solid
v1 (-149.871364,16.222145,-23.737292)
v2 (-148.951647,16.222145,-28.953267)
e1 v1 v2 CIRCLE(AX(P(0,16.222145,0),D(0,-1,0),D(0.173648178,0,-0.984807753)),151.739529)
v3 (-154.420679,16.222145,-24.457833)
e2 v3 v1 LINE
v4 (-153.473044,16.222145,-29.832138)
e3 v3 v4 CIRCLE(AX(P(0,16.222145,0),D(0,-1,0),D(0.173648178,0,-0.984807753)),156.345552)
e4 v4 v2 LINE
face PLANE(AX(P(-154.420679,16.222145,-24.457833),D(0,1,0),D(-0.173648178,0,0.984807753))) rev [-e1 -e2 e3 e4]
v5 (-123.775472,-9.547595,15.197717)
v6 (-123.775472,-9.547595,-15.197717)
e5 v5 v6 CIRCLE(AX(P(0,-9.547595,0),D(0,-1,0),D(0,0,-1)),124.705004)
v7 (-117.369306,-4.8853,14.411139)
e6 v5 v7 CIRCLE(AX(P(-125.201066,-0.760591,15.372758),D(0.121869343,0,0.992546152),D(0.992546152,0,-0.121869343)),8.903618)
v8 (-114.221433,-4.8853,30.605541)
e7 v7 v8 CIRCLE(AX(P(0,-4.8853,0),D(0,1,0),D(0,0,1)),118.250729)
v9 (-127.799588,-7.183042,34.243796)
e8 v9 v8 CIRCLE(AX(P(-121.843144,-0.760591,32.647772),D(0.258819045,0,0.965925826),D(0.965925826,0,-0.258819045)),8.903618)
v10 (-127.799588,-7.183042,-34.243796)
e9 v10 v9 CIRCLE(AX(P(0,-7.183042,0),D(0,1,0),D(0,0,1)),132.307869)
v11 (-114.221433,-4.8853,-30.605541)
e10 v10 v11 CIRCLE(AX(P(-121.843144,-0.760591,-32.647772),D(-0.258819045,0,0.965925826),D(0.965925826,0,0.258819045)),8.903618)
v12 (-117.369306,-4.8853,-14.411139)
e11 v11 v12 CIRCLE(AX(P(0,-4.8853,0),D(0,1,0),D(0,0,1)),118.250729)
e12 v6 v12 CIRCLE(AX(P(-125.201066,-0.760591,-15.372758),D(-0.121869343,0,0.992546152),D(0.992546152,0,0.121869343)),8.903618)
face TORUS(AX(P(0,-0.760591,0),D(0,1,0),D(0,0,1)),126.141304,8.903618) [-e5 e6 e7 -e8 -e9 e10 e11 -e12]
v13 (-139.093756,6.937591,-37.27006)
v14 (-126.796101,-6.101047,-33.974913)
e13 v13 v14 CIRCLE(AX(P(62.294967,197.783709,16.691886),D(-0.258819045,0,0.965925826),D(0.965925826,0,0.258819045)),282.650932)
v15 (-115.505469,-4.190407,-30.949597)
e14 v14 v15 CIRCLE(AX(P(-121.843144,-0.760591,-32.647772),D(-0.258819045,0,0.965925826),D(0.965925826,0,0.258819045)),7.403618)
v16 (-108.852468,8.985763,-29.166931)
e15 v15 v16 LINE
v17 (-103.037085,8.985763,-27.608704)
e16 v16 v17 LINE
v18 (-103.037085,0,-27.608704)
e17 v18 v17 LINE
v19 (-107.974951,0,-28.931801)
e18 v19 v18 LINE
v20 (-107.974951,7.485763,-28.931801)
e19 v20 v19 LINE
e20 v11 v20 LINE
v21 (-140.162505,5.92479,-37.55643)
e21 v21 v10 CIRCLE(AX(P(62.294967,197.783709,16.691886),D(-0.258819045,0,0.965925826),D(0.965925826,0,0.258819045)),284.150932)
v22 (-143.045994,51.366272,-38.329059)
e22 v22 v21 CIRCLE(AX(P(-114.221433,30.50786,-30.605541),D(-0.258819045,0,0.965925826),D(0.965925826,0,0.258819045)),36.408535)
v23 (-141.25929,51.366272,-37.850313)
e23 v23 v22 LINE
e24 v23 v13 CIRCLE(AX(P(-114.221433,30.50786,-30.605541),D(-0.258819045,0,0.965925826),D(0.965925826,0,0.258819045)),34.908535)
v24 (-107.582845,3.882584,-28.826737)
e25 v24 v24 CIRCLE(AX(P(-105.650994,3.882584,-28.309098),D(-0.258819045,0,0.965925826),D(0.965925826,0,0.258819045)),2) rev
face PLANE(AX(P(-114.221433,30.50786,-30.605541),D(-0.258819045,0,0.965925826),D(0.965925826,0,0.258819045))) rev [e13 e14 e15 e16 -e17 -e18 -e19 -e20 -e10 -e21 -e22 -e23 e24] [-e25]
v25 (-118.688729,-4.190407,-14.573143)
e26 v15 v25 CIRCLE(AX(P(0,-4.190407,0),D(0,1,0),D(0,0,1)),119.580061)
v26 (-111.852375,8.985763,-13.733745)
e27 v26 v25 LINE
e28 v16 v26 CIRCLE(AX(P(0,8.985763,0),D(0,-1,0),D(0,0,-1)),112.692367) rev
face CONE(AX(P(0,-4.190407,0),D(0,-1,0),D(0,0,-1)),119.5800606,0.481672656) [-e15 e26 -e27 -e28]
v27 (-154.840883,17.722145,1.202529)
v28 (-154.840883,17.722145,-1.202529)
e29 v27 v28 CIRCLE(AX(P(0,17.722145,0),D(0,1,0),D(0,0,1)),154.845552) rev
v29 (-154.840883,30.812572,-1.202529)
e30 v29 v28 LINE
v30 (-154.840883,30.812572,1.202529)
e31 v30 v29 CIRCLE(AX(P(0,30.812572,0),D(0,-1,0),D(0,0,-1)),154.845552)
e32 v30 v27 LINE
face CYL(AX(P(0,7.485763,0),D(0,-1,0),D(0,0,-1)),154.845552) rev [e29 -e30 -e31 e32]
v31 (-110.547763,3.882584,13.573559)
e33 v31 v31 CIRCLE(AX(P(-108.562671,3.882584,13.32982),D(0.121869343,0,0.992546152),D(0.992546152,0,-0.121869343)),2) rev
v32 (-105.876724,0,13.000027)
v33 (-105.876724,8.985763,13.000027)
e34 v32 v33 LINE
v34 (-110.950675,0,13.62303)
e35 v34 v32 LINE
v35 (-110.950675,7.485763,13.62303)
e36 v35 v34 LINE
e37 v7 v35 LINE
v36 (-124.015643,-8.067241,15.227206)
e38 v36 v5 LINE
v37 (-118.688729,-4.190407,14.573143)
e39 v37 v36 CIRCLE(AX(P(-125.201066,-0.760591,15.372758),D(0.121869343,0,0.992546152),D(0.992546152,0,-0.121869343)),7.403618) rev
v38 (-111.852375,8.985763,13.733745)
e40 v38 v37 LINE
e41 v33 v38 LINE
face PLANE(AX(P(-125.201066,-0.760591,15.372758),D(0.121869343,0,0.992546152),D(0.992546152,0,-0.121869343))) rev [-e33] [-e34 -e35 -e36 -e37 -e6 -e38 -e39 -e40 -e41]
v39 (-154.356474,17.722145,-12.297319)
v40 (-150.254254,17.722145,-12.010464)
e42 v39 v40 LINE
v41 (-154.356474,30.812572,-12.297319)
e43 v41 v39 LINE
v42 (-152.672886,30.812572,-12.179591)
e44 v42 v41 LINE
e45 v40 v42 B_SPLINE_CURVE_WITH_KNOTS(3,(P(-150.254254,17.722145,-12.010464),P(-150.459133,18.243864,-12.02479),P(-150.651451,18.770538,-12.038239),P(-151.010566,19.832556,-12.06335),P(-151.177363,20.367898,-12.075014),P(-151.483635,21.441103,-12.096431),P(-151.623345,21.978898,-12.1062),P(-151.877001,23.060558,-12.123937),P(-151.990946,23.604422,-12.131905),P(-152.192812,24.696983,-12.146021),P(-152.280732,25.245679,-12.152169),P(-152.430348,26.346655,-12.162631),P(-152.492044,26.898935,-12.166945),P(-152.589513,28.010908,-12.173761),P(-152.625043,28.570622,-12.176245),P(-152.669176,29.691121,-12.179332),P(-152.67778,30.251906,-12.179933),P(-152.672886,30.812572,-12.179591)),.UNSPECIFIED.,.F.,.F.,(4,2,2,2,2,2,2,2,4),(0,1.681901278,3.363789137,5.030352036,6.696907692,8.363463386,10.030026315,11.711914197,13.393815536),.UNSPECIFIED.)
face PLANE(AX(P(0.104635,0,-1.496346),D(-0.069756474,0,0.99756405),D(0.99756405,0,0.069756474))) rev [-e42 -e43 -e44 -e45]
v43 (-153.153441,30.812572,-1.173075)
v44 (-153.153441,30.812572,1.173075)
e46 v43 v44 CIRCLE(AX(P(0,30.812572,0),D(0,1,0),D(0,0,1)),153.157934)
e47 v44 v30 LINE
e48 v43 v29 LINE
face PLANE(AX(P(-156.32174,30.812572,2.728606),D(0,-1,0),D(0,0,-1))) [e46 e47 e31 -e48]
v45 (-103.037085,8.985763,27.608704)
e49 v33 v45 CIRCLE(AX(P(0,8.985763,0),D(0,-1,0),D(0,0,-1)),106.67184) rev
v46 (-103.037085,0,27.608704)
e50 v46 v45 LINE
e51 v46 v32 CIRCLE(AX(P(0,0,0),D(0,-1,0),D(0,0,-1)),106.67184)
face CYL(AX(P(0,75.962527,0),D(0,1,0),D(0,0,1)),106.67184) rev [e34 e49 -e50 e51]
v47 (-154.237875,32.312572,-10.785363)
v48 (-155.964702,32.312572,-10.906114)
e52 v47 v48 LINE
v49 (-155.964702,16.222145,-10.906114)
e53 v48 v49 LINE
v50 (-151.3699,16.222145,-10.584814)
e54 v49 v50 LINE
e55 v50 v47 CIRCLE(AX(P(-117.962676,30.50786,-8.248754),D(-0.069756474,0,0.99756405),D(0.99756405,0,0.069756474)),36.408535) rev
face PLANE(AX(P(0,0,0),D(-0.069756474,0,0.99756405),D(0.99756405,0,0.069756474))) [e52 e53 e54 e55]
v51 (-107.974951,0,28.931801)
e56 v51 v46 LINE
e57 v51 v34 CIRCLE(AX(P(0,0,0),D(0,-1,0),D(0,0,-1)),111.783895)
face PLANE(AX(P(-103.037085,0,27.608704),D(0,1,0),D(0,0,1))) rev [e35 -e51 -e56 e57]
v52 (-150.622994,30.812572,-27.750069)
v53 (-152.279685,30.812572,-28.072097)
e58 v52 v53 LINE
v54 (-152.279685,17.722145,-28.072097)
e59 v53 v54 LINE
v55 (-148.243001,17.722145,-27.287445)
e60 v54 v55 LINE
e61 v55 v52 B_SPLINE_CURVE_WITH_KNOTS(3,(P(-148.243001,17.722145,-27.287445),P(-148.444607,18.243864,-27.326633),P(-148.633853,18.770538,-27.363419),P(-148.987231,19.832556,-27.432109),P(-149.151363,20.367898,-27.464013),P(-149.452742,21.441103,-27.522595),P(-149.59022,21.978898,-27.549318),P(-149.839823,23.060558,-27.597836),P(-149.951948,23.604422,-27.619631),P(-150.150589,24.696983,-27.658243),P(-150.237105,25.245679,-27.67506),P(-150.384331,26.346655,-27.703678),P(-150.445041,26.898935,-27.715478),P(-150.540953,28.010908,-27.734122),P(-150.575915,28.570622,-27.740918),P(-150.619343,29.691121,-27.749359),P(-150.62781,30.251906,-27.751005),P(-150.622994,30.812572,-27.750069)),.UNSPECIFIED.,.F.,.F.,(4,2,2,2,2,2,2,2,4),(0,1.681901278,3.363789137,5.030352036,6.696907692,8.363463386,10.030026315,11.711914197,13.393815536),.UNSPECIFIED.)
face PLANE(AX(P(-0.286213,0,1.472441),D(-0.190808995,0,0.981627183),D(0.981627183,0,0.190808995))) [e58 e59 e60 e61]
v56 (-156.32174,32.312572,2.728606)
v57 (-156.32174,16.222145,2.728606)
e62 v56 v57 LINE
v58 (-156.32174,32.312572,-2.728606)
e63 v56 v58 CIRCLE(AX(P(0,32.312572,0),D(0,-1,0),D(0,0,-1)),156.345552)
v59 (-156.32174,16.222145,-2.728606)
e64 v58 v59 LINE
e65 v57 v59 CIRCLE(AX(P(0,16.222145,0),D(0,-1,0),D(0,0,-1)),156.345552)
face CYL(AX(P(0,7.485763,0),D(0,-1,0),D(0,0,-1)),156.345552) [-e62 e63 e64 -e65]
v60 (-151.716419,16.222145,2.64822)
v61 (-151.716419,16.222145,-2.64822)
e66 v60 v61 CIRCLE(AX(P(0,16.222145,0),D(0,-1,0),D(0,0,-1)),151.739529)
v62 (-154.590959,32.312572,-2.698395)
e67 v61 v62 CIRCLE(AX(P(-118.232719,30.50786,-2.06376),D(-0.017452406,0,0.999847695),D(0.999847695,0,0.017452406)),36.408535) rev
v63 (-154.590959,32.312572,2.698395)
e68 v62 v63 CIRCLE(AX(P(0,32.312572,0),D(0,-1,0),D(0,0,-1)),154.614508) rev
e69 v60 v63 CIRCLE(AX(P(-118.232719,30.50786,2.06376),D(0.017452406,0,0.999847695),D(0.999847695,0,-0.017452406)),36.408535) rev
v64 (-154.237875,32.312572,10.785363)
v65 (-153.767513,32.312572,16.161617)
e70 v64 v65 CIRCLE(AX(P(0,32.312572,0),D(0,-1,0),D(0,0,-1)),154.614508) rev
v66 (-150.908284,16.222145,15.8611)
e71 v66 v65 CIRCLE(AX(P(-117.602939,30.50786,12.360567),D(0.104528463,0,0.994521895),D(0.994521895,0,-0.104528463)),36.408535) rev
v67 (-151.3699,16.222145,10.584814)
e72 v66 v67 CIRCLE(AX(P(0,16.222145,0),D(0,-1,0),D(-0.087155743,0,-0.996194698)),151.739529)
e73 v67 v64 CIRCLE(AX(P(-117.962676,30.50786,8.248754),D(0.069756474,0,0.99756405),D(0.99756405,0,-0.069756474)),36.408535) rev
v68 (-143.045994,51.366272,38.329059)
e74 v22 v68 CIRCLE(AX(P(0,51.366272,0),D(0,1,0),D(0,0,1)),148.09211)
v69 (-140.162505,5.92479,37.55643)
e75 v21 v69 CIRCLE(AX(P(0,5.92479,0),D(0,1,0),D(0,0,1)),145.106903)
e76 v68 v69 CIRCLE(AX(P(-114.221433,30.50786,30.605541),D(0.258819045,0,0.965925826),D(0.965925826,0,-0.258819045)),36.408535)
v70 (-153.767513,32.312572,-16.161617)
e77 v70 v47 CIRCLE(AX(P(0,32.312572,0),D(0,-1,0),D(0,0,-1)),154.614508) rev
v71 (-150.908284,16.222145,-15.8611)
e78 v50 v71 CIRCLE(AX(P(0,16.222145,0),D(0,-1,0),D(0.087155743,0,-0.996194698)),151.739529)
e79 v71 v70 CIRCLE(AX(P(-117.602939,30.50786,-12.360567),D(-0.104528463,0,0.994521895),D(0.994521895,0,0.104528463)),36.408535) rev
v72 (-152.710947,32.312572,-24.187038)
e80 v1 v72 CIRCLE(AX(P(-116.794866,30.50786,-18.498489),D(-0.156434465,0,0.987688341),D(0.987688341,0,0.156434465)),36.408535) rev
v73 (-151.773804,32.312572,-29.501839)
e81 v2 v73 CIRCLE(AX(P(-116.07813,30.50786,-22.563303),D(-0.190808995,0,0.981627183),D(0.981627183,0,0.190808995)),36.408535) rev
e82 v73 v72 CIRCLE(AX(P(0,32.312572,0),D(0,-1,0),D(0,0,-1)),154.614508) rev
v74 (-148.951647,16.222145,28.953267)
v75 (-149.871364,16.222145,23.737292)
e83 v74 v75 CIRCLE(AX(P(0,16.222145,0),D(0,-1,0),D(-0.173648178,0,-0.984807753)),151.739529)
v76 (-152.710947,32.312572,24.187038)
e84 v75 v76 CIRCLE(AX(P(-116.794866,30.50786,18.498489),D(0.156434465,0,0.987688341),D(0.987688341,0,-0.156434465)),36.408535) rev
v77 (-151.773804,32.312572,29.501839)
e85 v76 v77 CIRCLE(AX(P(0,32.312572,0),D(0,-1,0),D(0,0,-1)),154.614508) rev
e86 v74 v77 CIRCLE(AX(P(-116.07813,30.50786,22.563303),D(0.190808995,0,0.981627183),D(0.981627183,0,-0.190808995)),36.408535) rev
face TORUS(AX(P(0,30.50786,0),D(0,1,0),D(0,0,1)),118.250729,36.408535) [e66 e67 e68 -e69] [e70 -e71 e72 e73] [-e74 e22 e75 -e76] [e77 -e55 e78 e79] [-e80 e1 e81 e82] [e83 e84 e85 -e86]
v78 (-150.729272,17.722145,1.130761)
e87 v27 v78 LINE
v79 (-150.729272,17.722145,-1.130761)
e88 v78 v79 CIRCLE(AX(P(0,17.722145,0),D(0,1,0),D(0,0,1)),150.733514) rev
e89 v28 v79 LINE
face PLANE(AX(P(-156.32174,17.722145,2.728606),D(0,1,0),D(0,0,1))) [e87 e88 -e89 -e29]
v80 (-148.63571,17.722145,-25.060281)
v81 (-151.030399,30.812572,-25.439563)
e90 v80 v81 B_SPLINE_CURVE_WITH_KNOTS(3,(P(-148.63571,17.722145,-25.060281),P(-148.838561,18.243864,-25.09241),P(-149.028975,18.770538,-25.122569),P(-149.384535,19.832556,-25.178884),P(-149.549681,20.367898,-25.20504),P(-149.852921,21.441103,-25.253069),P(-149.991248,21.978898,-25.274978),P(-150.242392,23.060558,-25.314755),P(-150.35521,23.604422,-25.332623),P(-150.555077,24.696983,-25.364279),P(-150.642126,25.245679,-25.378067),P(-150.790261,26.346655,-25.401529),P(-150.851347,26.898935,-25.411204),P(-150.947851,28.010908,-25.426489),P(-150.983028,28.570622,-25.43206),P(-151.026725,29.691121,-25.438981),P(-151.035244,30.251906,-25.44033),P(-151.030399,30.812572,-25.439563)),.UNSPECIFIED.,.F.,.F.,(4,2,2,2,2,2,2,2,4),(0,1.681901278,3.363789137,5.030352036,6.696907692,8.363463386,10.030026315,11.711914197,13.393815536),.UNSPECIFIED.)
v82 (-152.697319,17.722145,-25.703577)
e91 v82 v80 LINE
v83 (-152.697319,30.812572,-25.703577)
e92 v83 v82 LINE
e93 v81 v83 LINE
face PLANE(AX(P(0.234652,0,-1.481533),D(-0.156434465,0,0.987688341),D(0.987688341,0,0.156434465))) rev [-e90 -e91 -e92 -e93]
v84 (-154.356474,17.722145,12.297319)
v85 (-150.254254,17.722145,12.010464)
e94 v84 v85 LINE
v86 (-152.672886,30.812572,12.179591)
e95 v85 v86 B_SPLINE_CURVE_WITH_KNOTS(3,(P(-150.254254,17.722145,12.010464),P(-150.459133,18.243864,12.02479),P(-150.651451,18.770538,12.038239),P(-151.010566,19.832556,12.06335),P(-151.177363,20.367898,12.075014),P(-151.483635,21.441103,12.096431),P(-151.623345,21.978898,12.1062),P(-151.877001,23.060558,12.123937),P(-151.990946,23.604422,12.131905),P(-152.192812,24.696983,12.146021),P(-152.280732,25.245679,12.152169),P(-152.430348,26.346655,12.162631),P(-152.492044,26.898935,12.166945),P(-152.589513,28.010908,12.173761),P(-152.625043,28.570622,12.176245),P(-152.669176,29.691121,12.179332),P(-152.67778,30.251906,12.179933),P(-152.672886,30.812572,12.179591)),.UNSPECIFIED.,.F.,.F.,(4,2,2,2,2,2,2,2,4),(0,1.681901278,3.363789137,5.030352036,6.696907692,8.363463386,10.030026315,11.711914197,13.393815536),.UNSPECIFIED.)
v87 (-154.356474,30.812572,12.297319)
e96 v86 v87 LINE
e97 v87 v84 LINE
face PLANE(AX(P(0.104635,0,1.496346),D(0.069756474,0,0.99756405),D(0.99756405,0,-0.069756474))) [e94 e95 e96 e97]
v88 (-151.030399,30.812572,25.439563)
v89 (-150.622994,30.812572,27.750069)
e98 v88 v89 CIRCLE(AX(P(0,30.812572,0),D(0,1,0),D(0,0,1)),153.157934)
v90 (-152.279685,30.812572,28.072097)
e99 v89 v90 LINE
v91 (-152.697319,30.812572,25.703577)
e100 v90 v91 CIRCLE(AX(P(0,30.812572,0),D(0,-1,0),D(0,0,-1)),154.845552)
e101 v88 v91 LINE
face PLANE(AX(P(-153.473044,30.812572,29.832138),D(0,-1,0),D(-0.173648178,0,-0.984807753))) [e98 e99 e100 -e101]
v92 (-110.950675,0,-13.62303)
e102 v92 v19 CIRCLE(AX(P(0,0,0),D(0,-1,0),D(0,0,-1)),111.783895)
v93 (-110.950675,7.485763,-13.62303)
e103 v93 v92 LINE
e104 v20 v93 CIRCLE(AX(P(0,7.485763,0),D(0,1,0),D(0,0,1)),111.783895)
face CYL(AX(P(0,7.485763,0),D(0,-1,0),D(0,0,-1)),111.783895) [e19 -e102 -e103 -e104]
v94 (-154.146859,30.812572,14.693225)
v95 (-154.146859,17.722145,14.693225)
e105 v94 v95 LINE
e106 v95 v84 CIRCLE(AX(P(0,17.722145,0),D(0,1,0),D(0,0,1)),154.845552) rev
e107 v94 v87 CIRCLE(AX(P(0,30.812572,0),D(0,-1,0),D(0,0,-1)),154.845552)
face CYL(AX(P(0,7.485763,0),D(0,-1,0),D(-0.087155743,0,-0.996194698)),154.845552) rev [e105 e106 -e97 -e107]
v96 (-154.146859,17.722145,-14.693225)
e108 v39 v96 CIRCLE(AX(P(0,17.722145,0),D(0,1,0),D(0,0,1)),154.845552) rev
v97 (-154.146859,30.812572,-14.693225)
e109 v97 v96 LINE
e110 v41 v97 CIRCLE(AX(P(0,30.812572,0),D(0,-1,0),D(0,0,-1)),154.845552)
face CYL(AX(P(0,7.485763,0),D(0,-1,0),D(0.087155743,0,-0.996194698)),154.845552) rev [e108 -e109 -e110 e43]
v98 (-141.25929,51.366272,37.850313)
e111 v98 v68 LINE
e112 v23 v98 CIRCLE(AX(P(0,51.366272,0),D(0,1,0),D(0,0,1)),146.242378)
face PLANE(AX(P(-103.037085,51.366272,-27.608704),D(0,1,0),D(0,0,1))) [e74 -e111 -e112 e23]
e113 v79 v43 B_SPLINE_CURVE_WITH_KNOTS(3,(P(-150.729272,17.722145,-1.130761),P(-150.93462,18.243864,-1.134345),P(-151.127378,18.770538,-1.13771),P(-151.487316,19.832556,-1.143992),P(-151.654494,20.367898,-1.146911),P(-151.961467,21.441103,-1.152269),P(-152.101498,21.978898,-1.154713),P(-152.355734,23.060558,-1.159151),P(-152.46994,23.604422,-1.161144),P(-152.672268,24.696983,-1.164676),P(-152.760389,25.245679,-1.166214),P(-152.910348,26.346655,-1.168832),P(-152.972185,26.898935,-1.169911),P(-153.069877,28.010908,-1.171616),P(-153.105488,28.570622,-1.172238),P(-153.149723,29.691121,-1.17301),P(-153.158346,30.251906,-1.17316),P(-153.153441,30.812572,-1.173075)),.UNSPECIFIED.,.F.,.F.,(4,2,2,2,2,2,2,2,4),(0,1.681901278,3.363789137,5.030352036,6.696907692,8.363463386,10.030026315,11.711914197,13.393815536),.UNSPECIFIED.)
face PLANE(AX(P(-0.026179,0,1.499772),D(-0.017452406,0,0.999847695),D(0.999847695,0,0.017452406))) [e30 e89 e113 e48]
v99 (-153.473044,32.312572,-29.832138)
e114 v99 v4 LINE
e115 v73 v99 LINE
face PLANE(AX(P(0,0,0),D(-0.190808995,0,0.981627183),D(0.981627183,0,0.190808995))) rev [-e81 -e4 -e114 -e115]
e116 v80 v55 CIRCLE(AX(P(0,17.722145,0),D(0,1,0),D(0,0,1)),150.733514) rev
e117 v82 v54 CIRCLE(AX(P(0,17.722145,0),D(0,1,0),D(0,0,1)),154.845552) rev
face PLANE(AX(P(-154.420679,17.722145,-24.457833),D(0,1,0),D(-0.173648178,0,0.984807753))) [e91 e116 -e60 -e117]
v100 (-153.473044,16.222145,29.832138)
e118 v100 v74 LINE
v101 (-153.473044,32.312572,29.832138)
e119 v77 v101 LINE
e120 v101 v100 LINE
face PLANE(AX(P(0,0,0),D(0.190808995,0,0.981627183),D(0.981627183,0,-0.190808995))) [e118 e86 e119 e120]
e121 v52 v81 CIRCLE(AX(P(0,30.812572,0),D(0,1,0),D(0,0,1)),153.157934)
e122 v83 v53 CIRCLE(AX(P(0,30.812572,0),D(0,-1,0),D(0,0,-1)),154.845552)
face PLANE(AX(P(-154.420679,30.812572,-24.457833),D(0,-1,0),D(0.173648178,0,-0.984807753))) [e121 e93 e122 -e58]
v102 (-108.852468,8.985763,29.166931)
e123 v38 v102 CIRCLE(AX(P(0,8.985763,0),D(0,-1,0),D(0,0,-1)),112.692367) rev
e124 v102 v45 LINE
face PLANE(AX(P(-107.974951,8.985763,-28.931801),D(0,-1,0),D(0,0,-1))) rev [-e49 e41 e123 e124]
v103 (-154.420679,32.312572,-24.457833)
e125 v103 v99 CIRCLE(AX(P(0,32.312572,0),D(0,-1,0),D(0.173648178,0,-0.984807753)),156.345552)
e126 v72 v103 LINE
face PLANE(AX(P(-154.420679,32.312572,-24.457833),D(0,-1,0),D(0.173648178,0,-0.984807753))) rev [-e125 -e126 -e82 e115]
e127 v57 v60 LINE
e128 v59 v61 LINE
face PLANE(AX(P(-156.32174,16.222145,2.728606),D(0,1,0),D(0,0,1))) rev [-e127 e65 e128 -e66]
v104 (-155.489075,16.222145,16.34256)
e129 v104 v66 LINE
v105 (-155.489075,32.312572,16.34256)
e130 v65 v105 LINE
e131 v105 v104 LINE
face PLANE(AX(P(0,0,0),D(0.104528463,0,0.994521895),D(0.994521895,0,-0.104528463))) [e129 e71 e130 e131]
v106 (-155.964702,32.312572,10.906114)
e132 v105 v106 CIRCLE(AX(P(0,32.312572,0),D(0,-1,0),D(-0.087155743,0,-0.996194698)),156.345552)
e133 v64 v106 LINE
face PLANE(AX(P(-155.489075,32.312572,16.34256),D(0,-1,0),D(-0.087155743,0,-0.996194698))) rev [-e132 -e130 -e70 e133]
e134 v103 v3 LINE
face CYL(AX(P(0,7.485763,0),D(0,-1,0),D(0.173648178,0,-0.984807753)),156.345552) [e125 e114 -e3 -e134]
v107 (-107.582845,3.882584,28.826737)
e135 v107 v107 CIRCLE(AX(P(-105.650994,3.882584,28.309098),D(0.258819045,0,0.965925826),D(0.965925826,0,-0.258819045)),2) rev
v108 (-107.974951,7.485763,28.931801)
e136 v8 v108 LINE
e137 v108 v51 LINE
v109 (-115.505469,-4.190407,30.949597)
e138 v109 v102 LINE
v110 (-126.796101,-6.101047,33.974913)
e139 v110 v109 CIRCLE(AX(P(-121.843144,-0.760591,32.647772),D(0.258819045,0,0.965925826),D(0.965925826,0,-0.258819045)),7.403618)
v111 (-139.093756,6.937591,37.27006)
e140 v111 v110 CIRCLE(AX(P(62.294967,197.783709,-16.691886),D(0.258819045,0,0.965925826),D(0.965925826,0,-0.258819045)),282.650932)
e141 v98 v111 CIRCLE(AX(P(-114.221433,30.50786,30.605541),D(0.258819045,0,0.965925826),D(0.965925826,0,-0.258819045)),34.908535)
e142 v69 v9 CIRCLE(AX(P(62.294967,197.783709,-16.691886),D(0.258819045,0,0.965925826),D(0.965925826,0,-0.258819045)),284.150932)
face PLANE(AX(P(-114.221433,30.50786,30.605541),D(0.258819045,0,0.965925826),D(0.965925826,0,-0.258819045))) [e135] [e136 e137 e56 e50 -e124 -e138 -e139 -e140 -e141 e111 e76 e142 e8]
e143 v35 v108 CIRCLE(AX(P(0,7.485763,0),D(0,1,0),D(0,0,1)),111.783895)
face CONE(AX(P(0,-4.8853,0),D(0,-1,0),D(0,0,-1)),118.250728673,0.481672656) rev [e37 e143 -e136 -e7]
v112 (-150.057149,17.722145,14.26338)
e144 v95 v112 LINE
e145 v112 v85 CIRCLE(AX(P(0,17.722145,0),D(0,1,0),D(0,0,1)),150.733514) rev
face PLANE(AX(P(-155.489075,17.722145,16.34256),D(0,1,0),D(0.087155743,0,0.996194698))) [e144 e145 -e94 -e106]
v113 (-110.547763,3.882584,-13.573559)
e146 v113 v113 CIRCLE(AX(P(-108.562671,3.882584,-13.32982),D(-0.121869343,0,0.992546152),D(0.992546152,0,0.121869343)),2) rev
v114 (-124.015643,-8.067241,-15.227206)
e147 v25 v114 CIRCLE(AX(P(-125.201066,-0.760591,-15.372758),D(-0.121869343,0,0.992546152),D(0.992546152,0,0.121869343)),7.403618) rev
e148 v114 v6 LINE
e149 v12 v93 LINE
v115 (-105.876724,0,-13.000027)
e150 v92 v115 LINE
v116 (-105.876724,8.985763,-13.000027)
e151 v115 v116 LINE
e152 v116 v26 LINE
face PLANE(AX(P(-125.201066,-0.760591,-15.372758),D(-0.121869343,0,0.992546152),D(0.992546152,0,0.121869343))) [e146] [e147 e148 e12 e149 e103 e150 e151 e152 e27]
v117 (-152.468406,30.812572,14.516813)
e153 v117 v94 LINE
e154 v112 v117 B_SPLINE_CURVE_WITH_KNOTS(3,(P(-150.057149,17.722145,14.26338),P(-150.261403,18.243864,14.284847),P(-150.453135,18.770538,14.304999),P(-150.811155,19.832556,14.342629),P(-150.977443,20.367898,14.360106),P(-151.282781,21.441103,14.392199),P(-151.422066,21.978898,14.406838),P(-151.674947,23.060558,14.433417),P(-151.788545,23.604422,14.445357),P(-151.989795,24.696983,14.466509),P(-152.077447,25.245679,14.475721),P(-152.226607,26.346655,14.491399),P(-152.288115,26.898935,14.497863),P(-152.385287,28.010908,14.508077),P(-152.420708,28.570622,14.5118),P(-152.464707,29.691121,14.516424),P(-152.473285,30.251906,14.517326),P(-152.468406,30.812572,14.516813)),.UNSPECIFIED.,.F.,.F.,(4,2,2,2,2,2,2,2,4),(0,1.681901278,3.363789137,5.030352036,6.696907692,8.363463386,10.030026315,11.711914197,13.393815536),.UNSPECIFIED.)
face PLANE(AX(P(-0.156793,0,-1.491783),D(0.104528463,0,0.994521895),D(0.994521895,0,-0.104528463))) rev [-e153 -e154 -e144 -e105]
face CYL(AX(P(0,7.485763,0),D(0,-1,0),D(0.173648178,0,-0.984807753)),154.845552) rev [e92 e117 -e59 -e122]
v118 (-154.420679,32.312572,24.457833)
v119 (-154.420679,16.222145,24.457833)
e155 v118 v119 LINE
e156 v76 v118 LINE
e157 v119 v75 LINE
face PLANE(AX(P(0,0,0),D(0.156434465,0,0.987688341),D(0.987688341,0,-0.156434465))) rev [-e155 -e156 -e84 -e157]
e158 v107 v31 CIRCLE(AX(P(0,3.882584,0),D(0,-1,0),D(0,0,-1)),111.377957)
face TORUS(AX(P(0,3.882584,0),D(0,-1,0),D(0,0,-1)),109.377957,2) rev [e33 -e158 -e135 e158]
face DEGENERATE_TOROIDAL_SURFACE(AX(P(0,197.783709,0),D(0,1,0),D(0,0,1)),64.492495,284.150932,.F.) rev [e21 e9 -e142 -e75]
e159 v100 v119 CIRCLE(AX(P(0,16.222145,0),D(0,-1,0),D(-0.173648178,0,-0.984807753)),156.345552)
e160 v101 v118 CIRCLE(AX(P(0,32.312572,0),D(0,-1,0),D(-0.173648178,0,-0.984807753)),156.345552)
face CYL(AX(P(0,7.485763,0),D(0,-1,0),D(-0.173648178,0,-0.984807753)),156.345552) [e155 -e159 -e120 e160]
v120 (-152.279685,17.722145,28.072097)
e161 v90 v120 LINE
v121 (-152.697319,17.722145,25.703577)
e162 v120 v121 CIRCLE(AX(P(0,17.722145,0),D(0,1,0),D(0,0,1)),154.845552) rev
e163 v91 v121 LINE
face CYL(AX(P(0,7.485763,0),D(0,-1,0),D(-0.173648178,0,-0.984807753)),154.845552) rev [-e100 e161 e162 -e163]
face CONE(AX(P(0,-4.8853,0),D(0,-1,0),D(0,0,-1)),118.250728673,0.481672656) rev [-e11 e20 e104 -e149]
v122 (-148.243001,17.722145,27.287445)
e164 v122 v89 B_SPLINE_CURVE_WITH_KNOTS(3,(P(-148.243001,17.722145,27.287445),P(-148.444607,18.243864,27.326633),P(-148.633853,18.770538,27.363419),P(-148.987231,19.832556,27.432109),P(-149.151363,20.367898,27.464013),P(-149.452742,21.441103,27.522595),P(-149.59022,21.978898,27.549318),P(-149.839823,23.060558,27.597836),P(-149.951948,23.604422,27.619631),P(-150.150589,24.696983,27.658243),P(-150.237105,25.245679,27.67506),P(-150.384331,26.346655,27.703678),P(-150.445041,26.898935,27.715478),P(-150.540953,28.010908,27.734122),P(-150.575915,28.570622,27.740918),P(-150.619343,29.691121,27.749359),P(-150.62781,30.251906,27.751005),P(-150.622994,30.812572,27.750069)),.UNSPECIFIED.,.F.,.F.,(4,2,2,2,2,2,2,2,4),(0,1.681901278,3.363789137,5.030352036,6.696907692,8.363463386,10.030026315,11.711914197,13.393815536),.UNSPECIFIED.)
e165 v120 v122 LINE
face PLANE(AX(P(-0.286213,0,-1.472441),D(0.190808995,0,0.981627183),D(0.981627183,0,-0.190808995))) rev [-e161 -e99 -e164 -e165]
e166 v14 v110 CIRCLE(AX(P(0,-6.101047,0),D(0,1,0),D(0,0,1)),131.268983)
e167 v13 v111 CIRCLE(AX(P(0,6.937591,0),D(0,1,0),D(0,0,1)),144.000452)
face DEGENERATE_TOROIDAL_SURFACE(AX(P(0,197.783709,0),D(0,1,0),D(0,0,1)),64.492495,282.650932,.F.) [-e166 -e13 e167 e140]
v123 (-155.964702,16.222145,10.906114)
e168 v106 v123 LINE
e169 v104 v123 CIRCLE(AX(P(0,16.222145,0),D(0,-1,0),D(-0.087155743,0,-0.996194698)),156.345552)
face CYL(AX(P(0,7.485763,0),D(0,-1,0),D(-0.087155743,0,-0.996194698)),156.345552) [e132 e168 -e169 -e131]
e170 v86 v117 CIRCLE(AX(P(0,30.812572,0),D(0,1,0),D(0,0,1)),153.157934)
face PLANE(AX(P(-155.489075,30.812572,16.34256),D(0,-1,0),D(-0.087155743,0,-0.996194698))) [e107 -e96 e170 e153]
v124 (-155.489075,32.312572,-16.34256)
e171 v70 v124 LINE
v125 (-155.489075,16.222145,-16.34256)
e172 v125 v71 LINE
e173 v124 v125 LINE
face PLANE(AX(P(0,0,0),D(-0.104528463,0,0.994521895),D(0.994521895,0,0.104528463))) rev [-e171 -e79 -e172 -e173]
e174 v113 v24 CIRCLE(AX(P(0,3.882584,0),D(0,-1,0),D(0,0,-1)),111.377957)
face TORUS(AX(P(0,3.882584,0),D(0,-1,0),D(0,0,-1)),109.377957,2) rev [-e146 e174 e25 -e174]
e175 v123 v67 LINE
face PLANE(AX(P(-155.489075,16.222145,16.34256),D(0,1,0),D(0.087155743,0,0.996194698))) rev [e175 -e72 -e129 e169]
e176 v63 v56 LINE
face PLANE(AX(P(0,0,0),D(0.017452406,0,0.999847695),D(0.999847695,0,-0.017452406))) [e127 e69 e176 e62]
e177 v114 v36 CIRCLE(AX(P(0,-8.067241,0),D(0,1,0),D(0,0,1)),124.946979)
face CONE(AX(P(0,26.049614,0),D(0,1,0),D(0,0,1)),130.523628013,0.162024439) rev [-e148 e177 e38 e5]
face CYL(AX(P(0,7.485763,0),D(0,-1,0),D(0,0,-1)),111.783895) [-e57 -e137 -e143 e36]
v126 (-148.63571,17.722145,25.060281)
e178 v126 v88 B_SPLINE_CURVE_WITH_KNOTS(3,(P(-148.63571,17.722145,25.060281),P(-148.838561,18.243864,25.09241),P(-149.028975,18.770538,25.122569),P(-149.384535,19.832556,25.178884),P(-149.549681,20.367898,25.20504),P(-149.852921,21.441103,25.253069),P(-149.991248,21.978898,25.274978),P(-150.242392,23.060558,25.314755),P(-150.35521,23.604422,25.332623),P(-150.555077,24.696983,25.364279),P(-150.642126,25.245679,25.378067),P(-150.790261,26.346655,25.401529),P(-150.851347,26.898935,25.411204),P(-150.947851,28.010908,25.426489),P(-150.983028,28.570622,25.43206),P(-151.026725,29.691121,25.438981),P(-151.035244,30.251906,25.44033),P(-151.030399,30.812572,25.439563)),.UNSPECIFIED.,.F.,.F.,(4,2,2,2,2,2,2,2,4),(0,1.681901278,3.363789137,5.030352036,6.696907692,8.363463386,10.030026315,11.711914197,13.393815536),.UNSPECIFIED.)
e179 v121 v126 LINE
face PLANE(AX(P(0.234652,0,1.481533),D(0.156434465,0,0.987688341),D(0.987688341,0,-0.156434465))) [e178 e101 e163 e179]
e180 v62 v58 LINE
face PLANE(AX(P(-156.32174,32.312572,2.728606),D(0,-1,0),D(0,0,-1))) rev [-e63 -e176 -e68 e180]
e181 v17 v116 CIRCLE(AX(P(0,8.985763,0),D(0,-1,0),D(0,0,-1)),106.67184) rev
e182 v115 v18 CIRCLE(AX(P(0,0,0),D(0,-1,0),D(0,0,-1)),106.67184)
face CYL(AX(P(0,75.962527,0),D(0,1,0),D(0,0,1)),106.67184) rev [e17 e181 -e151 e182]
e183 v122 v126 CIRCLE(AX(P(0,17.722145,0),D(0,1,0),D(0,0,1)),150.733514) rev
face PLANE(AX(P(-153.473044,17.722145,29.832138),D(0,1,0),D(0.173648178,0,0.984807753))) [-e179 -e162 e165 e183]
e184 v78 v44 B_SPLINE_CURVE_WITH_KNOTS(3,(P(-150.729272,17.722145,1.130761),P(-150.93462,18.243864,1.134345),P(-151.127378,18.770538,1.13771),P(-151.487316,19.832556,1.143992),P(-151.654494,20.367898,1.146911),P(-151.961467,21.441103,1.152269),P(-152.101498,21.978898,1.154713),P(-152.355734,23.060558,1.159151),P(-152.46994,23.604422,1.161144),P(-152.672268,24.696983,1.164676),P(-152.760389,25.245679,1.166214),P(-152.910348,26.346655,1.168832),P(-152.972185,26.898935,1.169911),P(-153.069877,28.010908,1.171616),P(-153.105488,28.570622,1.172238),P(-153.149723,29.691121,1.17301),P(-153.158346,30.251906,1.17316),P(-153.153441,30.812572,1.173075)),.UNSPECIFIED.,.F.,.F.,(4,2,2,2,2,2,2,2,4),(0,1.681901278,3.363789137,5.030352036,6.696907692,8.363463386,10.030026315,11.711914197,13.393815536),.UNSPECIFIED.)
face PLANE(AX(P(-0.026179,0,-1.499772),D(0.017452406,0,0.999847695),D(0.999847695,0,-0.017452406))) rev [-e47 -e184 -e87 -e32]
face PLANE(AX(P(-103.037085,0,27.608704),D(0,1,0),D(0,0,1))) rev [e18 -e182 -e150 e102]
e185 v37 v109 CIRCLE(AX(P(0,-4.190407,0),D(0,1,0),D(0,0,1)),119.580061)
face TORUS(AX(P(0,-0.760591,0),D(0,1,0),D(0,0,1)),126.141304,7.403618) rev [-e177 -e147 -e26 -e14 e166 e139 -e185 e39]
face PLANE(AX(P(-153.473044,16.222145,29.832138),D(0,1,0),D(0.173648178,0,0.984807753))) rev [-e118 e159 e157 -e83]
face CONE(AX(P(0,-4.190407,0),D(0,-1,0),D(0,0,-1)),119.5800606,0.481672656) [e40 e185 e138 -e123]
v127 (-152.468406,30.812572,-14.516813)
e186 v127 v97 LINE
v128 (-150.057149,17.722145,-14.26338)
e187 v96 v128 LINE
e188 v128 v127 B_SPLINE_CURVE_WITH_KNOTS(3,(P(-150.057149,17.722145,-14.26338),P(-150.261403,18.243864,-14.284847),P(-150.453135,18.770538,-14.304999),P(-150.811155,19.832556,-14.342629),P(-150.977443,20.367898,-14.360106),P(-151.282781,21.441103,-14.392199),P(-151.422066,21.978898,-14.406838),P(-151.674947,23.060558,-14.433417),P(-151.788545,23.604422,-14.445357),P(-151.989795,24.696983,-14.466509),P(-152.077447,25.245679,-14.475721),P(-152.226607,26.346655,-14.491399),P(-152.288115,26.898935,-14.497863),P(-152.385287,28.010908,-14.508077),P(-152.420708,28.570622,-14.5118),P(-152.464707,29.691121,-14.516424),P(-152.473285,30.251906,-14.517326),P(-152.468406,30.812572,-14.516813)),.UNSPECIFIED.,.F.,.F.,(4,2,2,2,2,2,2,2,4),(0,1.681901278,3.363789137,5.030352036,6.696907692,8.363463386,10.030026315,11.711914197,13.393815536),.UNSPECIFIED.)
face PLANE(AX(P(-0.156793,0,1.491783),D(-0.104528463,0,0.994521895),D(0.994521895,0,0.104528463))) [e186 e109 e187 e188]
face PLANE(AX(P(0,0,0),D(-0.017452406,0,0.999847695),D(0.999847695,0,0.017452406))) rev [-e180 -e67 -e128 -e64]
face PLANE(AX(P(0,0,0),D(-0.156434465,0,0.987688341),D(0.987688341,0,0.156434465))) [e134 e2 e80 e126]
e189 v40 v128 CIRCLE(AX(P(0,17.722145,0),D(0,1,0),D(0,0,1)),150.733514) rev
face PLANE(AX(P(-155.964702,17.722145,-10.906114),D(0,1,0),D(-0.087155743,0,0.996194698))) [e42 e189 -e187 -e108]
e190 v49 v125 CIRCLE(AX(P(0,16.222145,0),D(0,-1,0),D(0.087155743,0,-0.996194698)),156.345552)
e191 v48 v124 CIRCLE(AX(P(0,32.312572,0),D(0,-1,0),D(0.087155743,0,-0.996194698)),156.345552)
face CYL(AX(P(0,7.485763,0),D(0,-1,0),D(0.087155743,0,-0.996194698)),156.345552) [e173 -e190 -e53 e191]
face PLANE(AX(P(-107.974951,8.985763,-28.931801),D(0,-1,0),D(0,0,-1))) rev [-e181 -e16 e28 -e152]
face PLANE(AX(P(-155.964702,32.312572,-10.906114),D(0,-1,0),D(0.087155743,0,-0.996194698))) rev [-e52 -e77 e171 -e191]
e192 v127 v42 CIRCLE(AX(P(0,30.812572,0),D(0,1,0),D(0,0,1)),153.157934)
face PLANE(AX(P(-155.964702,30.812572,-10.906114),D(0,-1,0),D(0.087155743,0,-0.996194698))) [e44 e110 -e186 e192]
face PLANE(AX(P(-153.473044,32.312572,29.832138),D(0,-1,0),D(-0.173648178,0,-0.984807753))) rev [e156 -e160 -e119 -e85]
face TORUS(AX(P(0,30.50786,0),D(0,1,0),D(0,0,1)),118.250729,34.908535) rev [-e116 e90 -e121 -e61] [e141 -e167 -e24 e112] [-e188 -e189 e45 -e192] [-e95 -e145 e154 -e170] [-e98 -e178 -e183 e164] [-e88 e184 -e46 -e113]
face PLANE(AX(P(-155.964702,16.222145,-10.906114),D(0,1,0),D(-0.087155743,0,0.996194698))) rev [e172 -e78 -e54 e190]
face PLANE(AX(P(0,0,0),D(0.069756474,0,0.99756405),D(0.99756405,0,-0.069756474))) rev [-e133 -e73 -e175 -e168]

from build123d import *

# Parameters (mm, degrees)
REVOLVE1_ANGLE                  = 15
REVOLVE1_OTHER_WAY_ANGLE        = 15
REVOLVE2_START                  = 16.222144695
REVOLVE2_DEPTH                  = 16.090427574
CIRPATTERN1_COUNT               = 3
CIRPATTERN1_ANGLE               = 10
CIRPATTERN1_THE_OTHER_WAY_COUNT = 3
CIRPATTERN1_THE_OTHER_WAY_ANGLE = 10
SHELL3_START                    = 8.985762726
SHELL3_2_DEPTH                  = 42.380509533
SHELL3_START_2                  = 17.722144695
SHELL3_3_DEPTH                  = 13.090427574
SKETCH3_W                       = 5.112055803
SKETCH3_H                       = 7.485762726
REVOLVE3_ANGLE                  = 15
REVOLVE3_OTHER_WAY_ANGLE        = 15
CUT_REVOLVE2_ANGLE              = 7
CUT_REVOLVE2_OTHER_WAY_ANGLE    = 7
SKETCH11_R                      = 2


with BuildPart() as part:
    # Sketch1 → Revolve1 (revolve)
    with BuildSketch(Plane.XY):
        with BuildLine():
            Line((-111.783895357, 7.485762726), (-118.250728673, -4.885300025))
            ThreePointArc((-118.250728673, -4.885300025), (-124.705004152, -9.547595462), (-132.307869355, -7.183042355))
            ThreePointArc((-132.307869355, -7.183042355), (-138.813052314, -0.732302942), (-145.106903203, 5.924789912))
            ThreePointArc((-145.106903203, 5.924789912), (-154.580954265, 28.121202409), (-148.092110072, 51.366272259))
            Line((-148.092110072, 51.366272259), (-106.671839554, 51.366272259))
            Line((-106.671839554, 51.366272259), (-106.671839554, 7.485762726))
            Line((-106.671839554, 7.485762726), (-111.783895357, 7.485762726))
        make_face()
    revolve(axis=Axis((0, 75.962527062, 0), (0, -1, 0)), revolution_arc=REVOLVE1_ANGLE)

    # Sketch1 → Revolve1 other way (revolve)
    with BuildSketch(Plane.XY):
        with BuildLine():
            Line((-111.783895357, 7.485762726), (-118.250728673, -4.885300025))
            ThreePointArc((-118.250728673, -4.885300025), (-124.705004152, -9.547595462), (-132.307869355, -7.183042355))
            ThreePointArc((-132.307869355, -7.183042355), (-138.813052314, -0.732302942), (-145.106903203, 5.924789912))
            ThreePointArc((-145.106903203, 5.924789912), (-154.580954265, 28.121202409), (-148.092110072, 51.366272259))
            Line((-148.092110072, 51.366272259), (-106.671839554, 51.366272259))
            Line((-106.671839554, 51.366272259), (-106.671839554, 7.485762726))
            Line((-106.671839554, 7.485762726), (-111.783895357, 7.485762726))
        make_face()
    revolve(axis=Axis((0, 75.962527062, 0), (0, 1, 0)), revolution_arc=REVOLVE1_OTHER_WAY_ANGLE)

    # Revolve2: read off the stored shape, not the designer's step
    # Revolve2 outline → Revolve2 (add)
    with BuildSketch(Plane(origin=(0, 0, 0), x_dir=(1, 0, 0), z_dir=(0, 1, 0)).offset(REVOLVE2_START)):
        with BuildLine():
            ThreePointArc((-156.32174005, 2.728606122), (-156.345552235, 0), (-156.32174005, -2.728606122))
            Line((-156.32174005, -2.728606122), (-151.716418742, -2.64821994))
            Line((-151.716418742, -2.64821994), (-150, -2.61825974))
            Line((-150, -2.61825974), (-150, 2.61825974))
            Line((-150, 2.61825974), (-151.716418742, 2.64821994))
            Line((-151.716418742, 2.64821994), (-156.32174005, 2.728606122))
        make_face()
    revolve2 = extrude(amount=REVOLVE2_DEPTH)

    # CirPattern1: Revolve2 ×3 about axis
    cirpattern1_axis = Axis((0, 0, 0), (0, 1, 0))
    for i in range(1, CIRPATTERN1_COUNT):
        add(revolve2.rotate(cirpattern1_axis, i * CIRPATTERN1_ANGLE / (CIRPATTERN1_COUNT - 1)))

    # CirPattern1 the other way: Revolve2 ×3 about axis
    cirpattern1_the_other_way_axis = Axis((0, 0, 0), (0, -1, 0))
    for i in range(1, CIRPATTERN1_THE_OTHER_WAY_COUNT):
        add(revolve2.rotate(cirpattern1_the_other_way_axis, i * CIRPATTERN1_THE_OTHER_WAY_ANGLE / (CIRPATTERN1_THE_OTHER_WAY_COUNT - 1)))

    # Shell3: read off the stored shape, not the designer's step
    # Shell3 outline → Shell3 (revolve, cut)
    with BuildSketch(Plane.XY):
        with BuildLine():
            ThreePointArc((131.268982929, -6.101046516), (137.739825777, 0.315640187), (144.000452154, 6.937591016))
            ThreePointArc((144.000452154, 6.937591016), (153.114903986, 28.748570347), (146.242378119, 51.366272259))
            Line((146.242378119, 51.366272259), (112.692366824, 51.366272259))
            Line((112.692366824, 51.366272259), (112.692366824, 8.985762726))
            Line((112.692366824, 8.985762726), (119.5800606, -4.190406776))
            ThreePointArc((119.5800606, -4.190406776), (124.946978842, -8.067241366), (131.268982929, -6.101046516))
        make_face()
    revolve(axis=Axis((0, 0, 0), (0, 1, 0)), mode=Mode.SUBTRACT)

    # Shell3 2 outline → Shell3 2 (cut)
    with BuildSketch(Plane(origin=(0, 0, 0), x_dir=(1, 0, 0), z_dir=(0, 1, 0)).offset(SHELL3_START)):
        with BuildLine():
            Line((-103.037084763, 27.608703653), (-108.852467541, 29.166930772))
            ThreePointArc((-108.852467541, 29.166930772), (-112.692366824, 0), (-108.852467541, -29.166930772))
            Line((-108.852467541, -29.166930772), (-103.037084763, -27.608703653))
            ThreePointArc((-103.037084763, -27.608703653), (-106.671839554, 0), (-103.037084763, 27.608703653))
        make_face()
    extrude(amount=SHELL3_2_DEPTH, mode=Mode.SUBTRACT)

    # Shell3 3 outline → Shell3 3 (cut)
    with BuildSketch(Plane(origin=(0, 0, 0), x_dir=(1, 0, 0), z_dir=(0, 1, 0)).offset(SHELL3_START_2)):
        with BuildLine():
            ThreePointArc((-154.840882749, 1.20252917), (-154.845552235, 0), (-154.840882749, -1.20252917))
            Line((-154.840882749, -1.20252917), (-150.729272176, -1.13076074))
            Line((-150.729272176, -1.13076074), (-112.691399989, -0.466807206))
            ThreePointArc((-112.691399989, -0.466807206), (-112.692366824, 0), (-112.691399989, 0.466807206))
            Line((-112.691399989, 0.466807206), (-150.729272176, 1.13076074))
            Line((-150.729272176, 1.13076074), (-154.840882749, 1.20252917))
        make_face()
        with BuildLine():
            ThreePointArc((-112.22189026, -10.286733541), (-112.263538345, -9.821786937), (-112.303260118, -9.356671802))
            Line((-112.303260118, -9.356671802), (-150.254254081, -12.010463816))
            Line((-150.254254081, -12.010463816), (-154.356473766, -12.29731896))
            ThreePointArc((-154.356473766, -12.29731896), (-154.25631816, -13.495679116), (-154.14685912, -14.693225327))
            Line((-154.14685912, -14.693225327), (-150.057149497, -14.263379525))
            Line((-150.057149497, -14.263379525), (-112.22189026, -10.286733541))
        make_face()
        with BuildLine():
            Line((-150.254254081, 12.010463816), (-112.303260118, 9.356671802))
            ThreePointArc((-112.303260118, 9.356671802), (-112.263538345, 9.821786937), (-112.22189026, 10.286733541))
            Line((-112.22189026, 10.286733541), (-150.057149497, 14.263379525))
            Line((-150.057149497, 14.263379525), (-154.14685912, 14.693225327))
            ThreePointArc((-154.14685912, 14.693225327), (-154.25631816, 13.495679116), (-154.356473766, 12.29731896))
            Line((-154.356473766, 12.29731896), (-150.254254081, 12.010463816))
        make_face()
        with BuildLine():
            ThreePointArc((-110.898304185, -20.028371609), (-110.980316554, -19.568824134), (-111.060424629, -19.108940881))
            Line((-111.060424629, -19.108940881), (-148.635710387, -25.06028149))
            Line((-148.635710387, -25.06028149), (-152.697318814, -25.703577068))
            ThreePointArc((-152.697318814, -25.703577068), (-152.493100361, -26.888647965), (-152.279684816, -28.072097167))
            Line((-152.279684816, -28.072097167), (-110.898304185, -20.028371609))
        make_face()
        with BuildLine():
            Line((-148.635710387, 25.06028149), (-111.060424629, 19.108940881))
            ThreePointArc((-111.060424629, 19.108940881), (-110.980316554, 19.568824134), (-110.898304185, 20.028371609))
            Line((-110.898304185, 20.028371609), (-152.279684816, 28.072097167))
            ThreePointArc((-152.279684816, 28.072097167), (-152.493100361, 26.888647965), (-152.697318814, 25.703577068))
            Line((-152.697318814, 25.703577068), (-148.635710387, 25.06028149))
        make_face()
    extrude(amount=SHELL3_3_DEPTH, mode=Mode.SUBTRACT)

    # Sketch3 → Revolve3 (revolve)
    with BuildSketch(Plane.XY):
        with Locations((-109.227867456, 3.742881363)):
            Rectangle(SKETCH3_W, SKETCH3_H)
    revolve(axis=Axis((0, 7.485762726, 0), (0, 1, 0)), revolution_arc=REVOLVE3_ANGLE)

    # Sketch3 → Revolve3 other way (revolve)
    with BuildSketch(Plane.XY):
        with Locations((-109.227867456, 3.742881363)):
            Rectangle(SKETCH3_W, SKETCH3_H)
    revolve(axis=Axis((0, 7.485762726, 0), (0, -1, 0)), revolution_arc=REVOLVE3_OTHER_WAY_ANGLE)

    # Sketch8 → Cut-Revolve2 (revolve, cut)
    with BuildSketch(Plane.XY):
        with BuildLine():
            Line((-124.705004152, -9.547595462), (-130.523628013, 26.049613644))
            Line((-130.523628013, 26.049613644), (-106.671839554, 29.948362701))
            Line((-106.671839554, 29.948362701), (-106.671839554, 7.485762726))
            Line((-106.671839554, 7.485762726), (-106.671839554, 0))
            Line((-106.671839554, 0), (-111.783895357, 0))
            Line((-111.783895357, 0), (-111.783895357, 7.485762726))
            Line((-111.783895357, 7.485762726), (-118.250728673, -4.885300025))
            ThreePointArc((-118.250728673, -4.885300025), (-120.927677668, -7.978104694), (-124.705004152, -9.547595462))
        make_face()
    revolve(axis=Axis((0, 7.485762726, 0), (0, 1, 0)), revolution_arc=CUT_REVOLVE2_ANGLE, mode=Mode.SUBTRACT)

    # Sketch8 → Cut-Revolve2 other way (revolve, cut)
    with BuildSketch(Plane.XY):
        with BuildLine():
            Line((-124.705004152, -9.547595462), (-130.523628013, 26.049613644))
            Line((-130.523628013, 26.049613644), (-106.671839554, 29.948362701))
            Line((-106.671839554, 29.948362701), (-106.671839554, 7.485762726))
            Line((-106.671839554, 7.485762726), (-106.671839554, 0))
            Line((-106.671839554, 0), (-111.783895357, 0))
            Line((-111.783895357, 0), (-111.783895357, 7.485762726))
            Line((-111.783895357, 7.485762726), (-118.250728673, -4.885300025))
            ThreePointArc((-118.250728673, -4.885300025), (-120.927677668, -7.978104694), (-124.705004152, -9.547595462))
        make_face()
    revolve(axis=Axis((0, 7.485762726, 0), (0, -1, 0)), revolution_arc=CUT_REVOLVE2_OTHER_WAY_ANGLE, mode=Mode.SUBTRACT)

    # Sketch11 → Cut-Revolve3 (revolve, cut)
    with BuildSketch(Plane(origin=(0, 0, 0), x_dir=(0.9659258262890682, 0, -0.25881904510252135), z_dir=(0.2588190451025213, 0, 0.9659258262890681)), mode=Mode.PRIVATE) as cut_revolve3_sk:
        with Locations((-109.377957305, 3.882584066)):
            Circle(SKETCH11_R)
    revolve(cut_revolve3_sk.sketch.rotate(Axis((0, 7.485762726, 0), (0, 1, 0)), 334), axis=Axis((0, 7.485762726, 0), (0, 1, 0)), mode=Mode.SUBTRACT)


solid = part.part
